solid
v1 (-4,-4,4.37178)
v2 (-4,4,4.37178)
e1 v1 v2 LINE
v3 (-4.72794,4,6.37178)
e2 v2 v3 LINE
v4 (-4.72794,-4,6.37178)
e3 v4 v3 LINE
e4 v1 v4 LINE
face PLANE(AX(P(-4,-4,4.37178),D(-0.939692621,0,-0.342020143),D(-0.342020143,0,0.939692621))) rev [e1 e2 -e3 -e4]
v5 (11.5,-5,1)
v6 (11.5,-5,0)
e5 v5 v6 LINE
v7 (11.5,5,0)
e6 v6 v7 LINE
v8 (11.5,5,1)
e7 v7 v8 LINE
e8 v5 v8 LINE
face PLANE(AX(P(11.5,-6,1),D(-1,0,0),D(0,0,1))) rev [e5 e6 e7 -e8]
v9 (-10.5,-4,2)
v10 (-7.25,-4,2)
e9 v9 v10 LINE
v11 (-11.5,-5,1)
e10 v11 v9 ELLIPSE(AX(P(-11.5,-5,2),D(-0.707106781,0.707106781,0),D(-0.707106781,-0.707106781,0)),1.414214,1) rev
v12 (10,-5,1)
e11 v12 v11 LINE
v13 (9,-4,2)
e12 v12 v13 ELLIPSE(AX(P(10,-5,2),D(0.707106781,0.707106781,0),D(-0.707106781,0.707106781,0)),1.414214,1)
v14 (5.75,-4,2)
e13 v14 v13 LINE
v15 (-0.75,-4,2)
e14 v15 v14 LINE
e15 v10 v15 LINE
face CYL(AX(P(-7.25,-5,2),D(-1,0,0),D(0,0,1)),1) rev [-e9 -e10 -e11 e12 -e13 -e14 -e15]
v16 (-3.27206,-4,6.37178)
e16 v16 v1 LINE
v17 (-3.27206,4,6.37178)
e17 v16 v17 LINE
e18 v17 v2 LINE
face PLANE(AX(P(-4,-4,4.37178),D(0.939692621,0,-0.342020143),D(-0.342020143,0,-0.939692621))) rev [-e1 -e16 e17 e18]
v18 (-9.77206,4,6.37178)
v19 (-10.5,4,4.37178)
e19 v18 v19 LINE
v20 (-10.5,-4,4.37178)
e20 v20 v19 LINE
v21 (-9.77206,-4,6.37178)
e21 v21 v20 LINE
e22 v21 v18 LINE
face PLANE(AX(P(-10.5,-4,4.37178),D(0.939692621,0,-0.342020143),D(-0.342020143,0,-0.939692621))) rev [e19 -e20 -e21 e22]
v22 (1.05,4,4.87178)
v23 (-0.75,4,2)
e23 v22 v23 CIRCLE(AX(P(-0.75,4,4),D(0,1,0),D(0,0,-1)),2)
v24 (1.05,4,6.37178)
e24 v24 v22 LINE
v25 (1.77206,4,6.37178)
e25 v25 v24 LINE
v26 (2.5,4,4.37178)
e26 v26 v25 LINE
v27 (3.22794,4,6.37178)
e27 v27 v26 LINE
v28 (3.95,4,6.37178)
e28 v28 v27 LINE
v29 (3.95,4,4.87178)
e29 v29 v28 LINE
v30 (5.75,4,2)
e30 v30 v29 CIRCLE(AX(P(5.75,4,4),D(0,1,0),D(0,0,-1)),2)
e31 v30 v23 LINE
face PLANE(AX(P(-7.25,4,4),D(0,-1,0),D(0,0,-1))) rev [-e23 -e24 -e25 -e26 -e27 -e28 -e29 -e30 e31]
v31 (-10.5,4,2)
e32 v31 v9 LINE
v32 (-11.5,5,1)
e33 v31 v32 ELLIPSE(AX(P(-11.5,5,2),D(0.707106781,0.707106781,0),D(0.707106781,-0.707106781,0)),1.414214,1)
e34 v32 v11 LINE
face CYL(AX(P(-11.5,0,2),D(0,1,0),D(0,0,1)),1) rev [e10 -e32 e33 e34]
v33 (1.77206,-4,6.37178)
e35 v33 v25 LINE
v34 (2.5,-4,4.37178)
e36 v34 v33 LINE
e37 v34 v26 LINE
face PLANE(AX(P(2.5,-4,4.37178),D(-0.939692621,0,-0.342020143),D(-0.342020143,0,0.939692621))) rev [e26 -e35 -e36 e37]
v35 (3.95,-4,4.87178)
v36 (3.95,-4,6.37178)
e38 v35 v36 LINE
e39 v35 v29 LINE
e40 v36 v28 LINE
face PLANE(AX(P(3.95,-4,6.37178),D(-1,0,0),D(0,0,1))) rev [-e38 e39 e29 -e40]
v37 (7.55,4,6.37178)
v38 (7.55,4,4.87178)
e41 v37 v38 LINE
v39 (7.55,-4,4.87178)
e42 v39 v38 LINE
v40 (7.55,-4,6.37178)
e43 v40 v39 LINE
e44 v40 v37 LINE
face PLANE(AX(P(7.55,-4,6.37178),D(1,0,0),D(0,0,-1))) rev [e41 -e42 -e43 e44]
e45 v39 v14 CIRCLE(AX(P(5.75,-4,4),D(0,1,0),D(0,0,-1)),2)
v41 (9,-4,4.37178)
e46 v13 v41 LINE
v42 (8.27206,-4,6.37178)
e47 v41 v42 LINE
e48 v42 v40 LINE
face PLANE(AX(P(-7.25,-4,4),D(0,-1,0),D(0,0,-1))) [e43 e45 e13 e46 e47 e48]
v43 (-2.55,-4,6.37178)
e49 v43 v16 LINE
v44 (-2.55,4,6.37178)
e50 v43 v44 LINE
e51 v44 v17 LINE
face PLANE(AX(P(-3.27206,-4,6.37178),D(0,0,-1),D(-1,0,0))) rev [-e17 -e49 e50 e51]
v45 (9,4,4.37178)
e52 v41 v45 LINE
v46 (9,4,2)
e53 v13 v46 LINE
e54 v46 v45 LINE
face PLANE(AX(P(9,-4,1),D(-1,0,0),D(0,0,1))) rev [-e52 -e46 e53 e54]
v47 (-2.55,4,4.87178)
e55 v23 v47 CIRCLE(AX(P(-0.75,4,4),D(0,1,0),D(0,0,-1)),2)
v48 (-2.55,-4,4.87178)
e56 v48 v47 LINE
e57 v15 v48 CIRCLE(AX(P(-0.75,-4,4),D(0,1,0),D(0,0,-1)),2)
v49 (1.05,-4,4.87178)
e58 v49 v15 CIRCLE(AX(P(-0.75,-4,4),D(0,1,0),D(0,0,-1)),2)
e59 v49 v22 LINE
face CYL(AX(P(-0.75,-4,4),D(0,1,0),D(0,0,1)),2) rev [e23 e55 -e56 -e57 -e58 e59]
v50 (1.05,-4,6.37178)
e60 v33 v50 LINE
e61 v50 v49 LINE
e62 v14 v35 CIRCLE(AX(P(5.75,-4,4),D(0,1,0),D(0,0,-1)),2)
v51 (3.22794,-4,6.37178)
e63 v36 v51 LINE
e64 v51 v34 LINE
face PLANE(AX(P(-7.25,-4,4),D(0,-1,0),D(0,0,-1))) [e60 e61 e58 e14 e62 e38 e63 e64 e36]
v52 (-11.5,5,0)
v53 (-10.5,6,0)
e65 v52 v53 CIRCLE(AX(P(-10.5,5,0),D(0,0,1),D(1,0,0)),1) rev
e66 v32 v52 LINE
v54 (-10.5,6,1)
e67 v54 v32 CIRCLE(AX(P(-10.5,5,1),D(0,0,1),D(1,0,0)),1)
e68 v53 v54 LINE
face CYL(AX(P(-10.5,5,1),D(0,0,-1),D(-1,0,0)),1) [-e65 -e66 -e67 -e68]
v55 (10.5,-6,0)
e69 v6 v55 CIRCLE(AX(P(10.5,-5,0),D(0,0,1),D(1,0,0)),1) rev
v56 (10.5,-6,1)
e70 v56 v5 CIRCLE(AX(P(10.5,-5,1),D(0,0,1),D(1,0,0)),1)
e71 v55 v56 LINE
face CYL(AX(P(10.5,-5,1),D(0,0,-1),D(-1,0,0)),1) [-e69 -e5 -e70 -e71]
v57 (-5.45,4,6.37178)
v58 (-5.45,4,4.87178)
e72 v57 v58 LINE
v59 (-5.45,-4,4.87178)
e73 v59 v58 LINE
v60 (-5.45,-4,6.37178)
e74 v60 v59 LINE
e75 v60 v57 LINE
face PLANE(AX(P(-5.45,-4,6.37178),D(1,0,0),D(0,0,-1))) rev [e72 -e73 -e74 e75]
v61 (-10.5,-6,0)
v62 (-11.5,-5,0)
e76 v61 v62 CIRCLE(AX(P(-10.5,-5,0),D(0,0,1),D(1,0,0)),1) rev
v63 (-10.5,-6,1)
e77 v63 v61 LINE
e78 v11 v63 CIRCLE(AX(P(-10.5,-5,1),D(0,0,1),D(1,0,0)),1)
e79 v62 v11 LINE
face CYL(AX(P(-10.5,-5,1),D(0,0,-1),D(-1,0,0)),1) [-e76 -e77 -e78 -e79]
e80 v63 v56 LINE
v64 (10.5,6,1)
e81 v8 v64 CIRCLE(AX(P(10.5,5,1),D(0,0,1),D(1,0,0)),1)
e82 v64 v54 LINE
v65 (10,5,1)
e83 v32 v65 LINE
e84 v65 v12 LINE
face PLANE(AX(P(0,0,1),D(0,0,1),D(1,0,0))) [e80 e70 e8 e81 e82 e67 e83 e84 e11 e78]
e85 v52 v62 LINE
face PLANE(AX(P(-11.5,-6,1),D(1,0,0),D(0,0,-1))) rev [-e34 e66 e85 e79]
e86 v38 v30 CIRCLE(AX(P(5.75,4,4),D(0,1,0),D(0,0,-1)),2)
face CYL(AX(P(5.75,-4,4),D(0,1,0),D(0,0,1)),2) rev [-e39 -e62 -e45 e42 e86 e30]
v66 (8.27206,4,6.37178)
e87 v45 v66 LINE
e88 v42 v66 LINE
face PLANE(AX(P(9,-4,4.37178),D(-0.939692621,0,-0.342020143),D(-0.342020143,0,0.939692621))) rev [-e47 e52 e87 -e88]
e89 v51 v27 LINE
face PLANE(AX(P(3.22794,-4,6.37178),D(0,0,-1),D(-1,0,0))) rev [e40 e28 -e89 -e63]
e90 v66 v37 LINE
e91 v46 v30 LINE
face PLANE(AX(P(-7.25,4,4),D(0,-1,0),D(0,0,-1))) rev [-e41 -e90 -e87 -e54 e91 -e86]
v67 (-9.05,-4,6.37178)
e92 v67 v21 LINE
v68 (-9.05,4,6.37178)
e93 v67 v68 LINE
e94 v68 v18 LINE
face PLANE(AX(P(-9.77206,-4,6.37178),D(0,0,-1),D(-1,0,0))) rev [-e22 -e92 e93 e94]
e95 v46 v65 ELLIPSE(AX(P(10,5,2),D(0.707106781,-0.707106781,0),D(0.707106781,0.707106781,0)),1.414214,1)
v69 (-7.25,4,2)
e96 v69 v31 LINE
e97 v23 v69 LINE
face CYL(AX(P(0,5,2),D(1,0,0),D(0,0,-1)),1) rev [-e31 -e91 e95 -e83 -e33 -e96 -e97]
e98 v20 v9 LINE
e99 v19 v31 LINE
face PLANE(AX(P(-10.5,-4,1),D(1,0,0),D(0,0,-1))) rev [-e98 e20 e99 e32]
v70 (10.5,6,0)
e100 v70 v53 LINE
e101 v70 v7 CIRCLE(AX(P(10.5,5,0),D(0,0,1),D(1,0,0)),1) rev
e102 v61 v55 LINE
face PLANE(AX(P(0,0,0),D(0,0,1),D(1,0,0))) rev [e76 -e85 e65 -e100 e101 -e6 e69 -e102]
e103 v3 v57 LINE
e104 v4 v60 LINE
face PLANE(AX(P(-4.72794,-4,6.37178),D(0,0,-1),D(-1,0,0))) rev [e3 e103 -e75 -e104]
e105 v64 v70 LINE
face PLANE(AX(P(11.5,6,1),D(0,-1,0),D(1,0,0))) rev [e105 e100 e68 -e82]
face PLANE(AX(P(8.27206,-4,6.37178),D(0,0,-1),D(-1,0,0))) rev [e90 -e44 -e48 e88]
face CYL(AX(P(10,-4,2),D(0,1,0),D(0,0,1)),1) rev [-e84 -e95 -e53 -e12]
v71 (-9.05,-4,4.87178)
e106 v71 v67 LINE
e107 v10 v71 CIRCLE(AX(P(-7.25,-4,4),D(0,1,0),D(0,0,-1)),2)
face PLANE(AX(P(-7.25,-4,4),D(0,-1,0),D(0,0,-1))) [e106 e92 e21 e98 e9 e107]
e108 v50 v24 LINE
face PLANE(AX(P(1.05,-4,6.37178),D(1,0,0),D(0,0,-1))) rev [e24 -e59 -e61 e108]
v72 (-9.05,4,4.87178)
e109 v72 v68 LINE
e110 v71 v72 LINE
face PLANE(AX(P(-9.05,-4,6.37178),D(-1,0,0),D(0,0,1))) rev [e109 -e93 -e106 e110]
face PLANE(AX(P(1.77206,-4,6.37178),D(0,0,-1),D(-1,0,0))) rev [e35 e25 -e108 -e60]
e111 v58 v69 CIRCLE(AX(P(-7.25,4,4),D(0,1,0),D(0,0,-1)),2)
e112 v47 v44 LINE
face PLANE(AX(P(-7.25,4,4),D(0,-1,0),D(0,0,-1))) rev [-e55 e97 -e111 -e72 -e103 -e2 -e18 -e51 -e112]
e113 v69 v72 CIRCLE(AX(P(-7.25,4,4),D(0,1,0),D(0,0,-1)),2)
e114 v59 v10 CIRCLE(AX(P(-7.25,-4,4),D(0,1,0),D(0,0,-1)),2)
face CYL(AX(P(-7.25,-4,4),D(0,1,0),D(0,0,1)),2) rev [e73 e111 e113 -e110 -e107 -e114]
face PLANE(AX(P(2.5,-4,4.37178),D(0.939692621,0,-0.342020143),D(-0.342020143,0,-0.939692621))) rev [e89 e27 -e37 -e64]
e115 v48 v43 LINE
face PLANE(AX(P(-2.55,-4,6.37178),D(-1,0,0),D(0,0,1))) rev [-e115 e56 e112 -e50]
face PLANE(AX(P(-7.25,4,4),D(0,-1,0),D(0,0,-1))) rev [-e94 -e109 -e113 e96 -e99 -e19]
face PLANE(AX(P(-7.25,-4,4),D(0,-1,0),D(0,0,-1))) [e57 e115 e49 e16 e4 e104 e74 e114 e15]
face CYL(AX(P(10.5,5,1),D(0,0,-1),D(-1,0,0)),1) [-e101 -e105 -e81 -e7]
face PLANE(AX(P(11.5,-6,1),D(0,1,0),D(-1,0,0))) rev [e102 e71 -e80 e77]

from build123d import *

# Parameters (mm, degrees)
SKETCH1_W           = 23
SKETCH1_H           = 12
BOSS_EXTRUDE1_DEPTH = 1
BOSS_EXTRUDE2_DEPTH = 4
LPATTERN2_COUNT     = 3
LPATTERN2_PITCH     = 6.5
FILLET1_R           = 1
FILLET2_R           = 1


with BuildPart() as part:
    # Sketch1 → Boss-Extrude1 (new body)
    with BuildSketch(Plane.XY):
        Rectangle(SKETCH1_W, SKETCH1_H)
    extrude(amount=BOSS_EXTRUDE1_DEPTH)

    # Sketch3 → Boss-Extrude2 (add, symmetric)
    with BuildSketch(Plane.XZ):
        with BuildLine():
            Line((-10.5, 1), (-10.5, 4.371779789))
            Line((-10.5, 4.371779789), (-9.772059531, 6.371779789))
            Line((-9.772059531, 6.371779789), (-9.05, 6.371779789))
            Line((-9.05, 6.371779789), (-9.05, 4.871779789))
            ThreePointArc((-9.05, 4.871779789), (-7.25, 2), (-5.45, 4.871779789))
            Line((-5.45, 4.871779789), (-5.45, 6.371779789))
            Line((-5.45, 6.371779789), (-4.727940469, 6.371779789))
            Line((-4.727940469, 6.371779789), (-4, 4.371779789))
            Line((-4, 4.371779789), (-4, 1))
            Line((-4, 1), (-10.5, 1))
        make_face()
    boss_extrude2 = extrude(amount=BOSS_EXTRUDE2_DEPTH, both=True)

    # LPattern2: Boss-Extrude2 ×3
    with Locations(*[(i * LPATTERN2_PITCH, 0, 0) for i in range(1, LPATTERN2_COUNT)]):
        add(boss_extrude2)

    # Fillet1
    fillet1_edges = [part.edges().sort_by_distance(p)[0] for p in [
        (-11.5, 6, 0.5),
        (11.5, 6, 0.5),
        (11.5, -6, 0.5),
        (-11.5, -6, 0.5),
    ]]
    fillet(fillet1_edges, radius=FILLET1_R)

    # Fillet2
    fillet2_edges = [part.edges().sort_by_distance(p)[0] for p in [
        (-0.75, 4, 1),
        (-10.5, 0, 1),
        (-0.75, -4, 1),
        (9, 0, 1),
    ]]
    fillet(fillet2_edges, radius=FILLET2_R - 0.0001)  # a hair under: the kernel refuses the full size


solid = part.part
